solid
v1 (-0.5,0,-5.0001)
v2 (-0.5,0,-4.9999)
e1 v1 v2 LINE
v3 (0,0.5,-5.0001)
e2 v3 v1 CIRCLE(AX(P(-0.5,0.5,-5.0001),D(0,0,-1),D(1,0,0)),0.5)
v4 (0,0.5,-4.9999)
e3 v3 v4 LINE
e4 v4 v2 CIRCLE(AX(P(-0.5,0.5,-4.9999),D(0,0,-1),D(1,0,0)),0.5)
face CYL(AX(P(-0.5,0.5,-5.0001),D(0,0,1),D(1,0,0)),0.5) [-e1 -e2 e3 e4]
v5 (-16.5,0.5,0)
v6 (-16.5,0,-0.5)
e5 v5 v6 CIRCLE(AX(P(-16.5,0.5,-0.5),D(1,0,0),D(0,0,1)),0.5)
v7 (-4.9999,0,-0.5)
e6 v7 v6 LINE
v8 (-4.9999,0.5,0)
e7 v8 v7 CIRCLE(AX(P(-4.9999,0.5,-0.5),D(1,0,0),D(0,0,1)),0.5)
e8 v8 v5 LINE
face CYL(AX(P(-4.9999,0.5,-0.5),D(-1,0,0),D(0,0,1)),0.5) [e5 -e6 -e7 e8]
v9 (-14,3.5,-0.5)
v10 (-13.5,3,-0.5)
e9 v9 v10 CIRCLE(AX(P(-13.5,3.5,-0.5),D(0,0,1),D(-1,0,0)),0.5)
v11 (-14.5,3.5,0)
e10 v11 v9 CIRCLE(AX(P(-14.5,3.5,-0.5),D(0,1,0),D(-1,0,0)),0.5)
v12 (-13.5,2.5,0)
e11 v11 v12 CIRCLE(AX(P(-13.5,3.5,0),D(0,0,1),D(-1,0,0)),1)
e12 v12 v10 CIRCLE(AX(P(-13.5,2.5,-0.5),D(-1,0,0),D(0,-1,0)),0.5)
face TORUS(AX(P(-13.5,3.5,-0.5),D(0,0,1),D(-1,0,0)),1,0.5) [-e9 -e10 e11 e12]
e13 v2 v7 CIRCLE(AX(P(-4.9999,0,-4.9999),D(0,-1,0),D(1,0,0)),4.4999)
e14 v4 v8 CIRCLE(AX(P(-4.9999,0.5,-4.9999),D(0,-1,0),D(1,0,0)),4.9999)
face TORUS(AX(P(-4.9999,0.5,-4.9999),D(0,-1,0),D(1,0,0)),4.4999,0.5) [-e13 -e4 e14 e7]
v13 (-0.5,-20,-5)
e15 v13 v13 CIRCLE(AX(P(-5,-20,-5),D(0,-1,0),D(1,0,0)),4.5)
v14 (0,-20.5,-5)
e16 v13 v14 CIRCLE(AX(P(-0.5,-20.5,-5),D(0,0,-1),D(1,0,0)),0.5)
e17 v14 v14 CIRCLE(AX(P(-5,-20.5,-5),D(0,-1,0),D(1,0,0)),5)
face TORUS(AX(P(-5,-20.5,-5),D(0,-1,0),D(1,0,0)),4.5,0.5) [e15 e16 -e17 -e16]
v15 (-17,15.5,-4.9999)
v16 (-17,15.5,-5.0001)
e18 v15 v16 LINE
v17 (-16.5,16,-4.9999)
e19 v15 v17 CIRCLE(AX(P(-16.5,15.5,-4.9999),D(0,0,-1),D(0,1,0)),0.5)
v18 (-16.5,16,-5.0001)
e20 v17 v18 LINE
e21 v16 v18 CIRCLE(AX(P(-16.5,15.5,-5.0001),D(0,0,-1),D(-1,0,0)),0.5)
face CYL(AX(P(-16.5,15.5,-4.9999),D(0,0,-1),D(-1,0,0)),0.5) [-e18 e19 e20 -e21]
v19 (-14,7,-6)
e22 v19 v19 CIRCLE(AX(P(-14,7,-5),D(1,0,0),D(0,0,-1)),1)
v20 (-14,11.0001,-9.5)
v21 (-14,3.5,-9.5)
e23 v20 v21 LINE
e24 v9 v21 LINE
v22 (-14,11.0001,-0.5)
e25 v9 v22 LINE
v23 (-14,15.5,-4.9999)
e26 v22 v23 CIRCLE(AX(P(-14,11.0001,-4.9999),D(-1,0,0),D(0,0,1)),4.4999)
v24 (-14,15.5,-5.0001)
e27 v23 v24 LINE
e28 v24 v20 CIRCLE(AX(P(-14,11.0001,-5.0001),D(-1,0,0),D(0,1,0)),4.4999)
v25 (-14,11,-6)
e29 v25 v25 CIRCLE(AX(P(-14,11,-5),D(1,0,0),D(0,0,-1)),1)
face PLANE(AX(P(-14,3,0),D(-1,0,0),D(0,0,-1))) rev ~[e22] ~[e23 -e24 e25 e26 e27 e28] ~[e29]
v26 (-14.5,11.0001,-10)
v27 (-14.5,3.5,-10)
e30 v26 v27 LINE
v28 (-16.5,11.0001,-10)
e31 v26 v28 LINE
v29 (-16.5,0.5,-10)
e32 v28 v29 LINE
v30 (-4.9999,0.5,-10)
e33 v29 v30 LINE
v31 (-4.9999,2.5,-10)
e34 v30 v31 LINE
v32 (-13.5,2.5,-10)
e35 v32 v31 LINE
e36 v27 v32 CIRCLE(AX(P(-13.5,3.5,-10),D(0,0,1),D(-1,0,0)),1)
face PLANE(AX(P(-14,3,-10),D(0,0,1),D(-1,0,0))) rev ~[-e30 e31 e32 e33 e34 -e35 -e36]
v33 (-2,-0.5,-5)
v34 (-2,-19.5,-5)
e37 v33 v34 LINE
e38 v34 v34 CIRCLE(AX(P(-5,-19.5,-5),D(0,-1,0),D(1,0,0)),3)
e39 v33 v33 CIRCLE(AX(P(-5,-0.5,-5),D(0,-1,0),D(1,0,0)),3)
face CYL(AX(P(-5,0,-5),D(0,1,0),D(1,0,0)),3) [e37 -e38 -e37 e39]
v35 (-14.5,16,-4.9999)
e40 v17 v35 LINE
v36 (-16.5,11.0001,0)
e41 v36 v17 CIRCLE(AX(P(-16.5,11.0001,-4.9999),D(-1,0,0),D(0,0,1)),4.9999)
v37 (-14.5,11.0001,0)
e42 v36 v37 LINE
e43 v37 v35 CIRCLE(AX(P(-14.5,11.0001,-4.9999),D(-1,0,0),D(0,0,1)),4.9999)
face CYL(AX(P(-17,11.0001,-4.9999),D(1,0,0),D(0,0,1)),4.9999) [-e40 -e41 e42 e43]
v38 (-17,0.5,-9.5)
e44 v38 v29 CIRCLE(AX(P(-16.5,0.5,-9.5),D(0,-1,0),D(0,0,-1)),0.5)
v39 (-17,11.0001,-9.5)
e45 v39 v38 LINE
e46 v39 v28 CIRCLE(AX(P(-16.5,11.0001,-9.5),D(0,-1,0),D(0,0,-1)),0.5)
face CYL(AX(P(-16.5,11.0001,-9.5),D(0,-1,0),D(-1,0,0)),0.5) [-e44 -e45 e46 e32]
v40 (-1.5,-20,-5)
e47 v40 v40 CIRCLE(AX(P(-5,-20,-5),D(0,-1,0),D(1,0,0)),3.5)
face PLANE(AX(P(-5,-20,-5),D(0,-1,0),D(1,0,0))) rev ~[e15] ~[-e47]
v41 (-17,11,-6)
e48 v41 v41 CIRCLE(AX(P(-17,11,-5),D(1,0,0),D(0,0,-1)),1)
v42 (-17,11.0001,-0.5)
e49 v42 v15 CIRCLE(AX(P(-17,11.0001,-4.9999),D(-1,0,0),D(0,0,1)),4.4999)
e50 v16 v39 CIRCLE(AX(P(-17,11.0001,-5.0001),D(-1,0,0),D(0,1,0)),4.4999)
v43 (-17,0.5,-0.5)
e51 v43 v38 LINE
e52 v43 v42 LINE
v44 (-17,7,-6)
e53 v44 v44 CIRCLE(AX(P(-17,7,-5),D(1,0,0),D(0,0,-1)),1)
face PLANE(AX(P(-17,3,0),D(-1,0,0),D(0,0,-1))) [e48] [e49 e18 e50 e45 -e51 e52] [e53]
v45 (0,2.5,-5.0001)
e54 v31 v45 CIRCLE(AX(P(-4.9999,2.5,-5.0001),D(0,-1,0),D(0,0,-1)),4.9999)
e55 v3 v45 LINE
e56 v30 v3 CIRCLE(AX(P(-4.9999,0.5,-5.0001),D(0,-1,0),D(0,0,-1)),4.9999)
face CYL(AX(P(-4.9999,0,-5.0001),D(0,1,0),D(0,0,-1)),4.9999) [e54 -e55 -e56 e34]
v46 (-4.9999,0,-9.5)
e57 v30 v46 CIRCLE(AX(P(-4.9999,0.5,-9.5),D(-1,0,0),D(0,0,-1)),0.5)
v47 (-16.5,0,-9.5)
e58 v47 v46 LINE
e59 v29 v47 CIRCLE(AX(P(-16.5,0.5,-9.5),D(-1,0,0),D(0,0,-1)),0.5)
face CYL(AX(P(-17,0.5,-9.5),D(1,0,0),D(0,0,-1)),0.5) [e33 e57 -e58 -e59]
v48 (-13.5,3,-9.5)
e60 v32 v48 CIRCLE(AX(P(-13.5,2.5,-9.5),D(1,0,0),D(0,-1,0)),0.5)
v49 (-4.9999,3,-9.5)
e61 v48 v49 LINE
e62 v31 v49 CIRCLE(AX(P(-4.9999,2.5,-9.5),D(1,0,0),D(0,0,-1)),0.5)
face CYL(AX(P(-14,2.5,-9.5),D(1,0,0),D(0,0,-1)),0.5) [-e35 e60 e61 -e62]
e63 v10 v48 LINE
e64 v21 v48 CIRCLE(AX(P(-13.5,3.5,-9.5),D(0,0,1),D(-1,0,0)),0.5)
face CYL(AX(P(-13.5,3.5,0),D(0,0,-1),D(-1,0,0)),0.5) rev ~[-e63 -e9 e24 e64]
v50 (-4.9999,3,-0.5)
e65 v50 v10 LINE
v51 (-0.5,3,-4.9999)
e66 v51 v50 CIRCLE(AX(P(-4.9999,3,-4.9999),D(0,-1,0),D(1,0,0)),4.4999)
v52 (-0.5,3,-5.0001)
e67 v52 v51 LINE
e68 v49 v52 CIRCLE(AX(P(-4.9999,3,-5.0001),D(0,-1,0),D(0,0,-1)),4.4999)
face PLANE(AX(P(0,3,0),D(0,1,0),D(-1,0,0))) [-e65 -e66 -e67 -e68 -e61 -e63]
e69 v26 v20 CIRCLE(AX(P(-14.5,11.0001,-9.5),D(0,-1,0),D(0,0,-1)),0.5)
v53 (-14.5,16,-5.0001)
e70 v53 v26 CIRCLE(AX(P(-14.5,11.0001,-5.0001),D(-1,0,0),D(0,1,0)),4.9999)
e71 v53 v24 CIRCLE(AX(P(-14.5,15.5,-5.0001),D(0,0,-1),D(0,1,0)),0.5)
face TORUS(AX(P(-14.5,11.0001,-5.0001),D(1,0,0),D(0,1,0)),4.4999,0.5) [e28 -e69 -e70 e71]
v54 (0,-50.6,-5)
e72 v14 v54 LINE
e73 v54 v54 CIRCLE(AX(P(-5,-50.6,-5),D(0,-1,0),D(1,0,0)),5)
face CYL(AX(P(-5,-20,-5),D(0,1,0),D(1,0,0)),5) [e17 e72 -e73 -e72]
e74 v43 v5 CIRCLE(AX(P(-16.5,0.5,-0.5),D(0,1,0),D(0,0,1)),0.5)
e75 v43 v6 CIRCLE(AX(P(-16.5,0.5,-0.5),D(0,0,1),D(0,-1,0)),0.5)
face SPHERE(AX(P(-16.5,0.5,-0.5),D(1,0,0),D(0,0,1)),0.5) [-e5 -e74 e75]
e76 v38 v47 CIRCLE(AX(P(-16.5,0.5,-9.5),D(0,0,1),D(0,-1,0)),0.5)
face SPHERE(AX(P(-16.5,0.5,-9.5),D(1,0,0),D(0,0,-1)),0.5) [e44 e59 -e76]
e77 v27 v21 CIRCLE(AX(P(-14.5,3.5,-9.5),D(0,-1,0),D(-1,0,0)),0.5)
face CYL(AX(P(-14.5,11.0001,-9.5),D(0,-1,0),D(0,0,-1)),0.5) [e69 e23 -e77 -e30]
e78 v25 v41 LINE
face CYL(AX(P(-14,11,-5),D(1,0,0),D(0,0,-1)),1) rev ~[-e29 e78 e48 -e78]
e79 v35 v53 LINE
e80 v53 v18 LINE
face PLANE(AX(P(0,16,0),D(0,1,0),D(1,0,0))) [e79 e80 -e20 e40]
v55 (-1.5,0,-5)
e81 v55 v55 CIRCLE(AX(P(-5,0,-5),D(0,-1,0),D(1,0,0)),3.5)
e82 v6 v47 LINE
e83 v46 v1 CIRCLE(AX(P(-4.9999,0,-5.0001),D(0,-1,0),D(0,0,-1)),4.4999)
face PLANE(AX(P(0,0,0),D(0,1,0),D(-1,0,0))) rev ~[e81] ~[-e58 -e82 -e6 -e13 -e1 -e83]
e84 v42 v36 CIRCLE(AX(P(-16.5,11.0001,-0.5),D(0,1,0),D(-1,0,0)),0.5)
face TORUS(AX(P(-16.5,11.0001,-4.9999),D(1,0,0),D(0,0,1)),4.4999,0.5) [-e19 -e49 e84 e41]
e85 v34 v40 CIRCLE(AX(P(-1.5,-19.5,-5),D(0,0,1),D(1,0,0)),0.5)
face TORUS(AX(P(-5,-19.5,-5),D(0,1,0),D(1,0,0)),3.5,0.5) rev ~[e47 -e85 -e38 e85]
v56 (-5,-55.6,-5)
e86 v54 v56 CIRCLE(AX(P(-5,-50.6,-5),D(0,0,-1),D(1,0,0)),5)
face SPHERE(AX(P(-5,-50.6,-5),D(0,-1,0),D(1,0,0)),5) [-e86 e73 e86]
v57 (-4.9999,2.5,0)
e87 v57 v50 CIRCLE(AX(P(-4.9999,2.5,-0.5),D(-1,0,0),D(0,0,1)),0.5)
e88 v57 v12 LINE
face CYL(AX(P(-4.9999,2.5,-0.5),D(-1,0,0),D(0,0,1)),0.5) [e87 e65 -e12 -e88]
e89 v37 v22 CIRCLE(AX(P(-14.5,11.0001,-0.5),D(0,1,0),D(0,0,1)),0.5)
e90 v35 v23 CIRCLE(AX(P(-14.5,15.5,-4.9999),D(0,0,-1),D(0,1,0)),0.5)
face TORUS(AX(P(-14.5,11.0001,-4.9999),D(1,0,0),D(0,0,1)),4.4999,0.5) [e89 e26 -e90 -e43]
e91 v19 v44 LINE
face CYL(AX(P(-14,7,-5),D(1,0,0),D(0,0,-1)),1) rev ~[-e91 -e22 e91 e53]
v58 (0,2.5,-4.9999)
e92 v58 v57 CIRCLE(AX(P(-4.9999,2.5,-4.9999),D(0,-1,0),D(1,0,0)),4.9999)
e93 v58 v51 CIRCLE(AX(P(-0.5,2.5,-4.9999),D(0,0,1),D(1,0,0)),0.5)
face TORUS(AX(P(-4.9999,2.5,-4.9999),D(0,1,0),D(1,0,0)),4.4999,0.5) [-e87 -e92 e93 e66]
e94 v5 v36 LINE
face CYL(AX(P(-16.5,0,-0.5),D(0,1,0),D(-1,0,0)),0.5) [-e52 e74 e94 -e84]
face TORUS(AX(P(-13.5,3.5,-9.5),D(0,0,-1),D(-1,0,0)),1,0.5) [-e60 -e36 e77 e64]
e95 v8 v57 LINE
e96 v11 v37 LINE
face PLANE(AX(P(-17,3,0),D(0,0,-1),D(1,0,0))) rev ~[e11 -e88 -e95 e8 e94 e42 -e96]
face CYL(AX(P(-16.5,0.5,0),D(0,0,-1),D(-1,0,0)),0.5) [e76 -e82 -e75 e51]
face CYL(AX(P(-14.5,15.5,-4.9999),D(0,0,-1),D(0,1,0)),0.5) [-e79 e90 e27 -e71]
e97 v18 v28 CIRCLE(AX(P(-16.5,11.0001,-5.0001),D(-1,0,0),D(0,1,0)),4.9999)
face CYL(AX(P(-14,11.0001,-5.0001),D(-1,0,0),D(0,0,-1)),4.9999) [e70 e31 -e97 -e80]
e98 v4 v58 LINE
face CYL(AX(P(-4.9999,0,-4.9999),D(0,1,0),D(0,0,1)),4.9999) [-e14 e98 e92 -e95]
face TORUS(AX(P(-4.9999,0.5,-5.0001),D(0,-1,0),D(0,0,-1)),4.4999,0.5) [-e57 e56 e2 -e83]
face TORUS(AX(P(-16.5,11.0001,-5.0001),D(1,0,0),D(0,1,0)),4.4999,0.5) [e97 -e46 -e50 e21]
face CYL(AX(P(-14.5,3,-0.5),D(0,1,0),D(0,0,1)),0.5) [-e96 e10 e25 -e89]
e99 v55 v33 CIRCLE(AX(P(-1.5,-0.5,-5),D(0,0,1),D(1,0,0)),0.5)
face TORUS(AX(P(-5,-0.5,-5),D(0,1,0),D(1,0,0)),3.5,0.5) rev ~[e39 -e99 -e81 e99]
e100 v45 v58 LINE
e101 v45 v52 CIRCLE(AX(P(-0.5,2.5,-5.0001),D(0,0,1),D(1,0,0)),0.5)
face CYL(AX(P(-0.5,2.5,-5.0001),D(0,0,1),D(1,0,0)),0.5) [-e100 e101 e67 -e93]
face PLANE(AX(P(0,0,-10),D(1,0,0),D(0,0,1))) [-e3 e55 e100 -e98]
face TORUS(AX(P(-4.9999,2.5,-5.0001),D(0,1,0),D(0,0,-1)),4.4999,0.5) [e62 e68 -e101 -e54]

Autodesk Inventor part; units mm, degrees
ref_plane "YZ Plane" through (0, 0, 0) normal (1, 0, 0) x (0, 1, 0)
ref_plane "XZ Plane" through (0, 0, 0) normal (0, 1, 0) x (-1, 0, 0)
ref_plane "XY Plane" through (0, 0, 0) normal (0, 0, 1) x (1, 0, 0)
sketch "Sketch2" plane through (0, 0, 0) normal (0, 1, 0) x (-1, 0, 0)
  line L0 (0, 0) -> (17, 0)
  line L1 (17, 0) -> (17, -10)
  line L2 (17, -10) -> (0, -10)
  line L3 (0, -10) -> (0, 0)
  line L4 (17, 0) -> (14, 0)
  line L5 (14, -10) -> (17, -10)
  line L6 (17, -10) -> (17, 0)
  dimension "d2" = 17
  dimension "d3" = 10
extrude "Extrusion1" add sketch "Sketch2" along normal blind 3
fillet "Fillet1" radius 5 2 edges at (0, 1.5, -10) (0, 1.5, 0)
sketch "Sketch5" plane through (0, 0, 0) normal (0, -1, 0) x (1, 0, 0)
  circle A0 centre (-5, -5) radius 3
  line L0 (-17, 0) -> (-5, 0) projected
  arc A1 (-5, -10) -> (-5, 0) centre (-5, -5) ccw projected
  point P0 (0, 0)
  dimension "d19" = 6
  dimension "d20" = 5
  dimension "d21" = 0
extrude "Extrusion4" add sketch "Sketch5" along normal blind 20
sketch "Sketch6" plane through (-5, -20, -5) normal (0, -1, 0) x (1, 0, 0)
  circle A0 centre (0, 0) radius 5
  point P0 (5, 5)
  dimension "d24" = 10
extrude "Extrusion5" add sketch "Sketch6" along normal blind 35.6
fillet "Fillet2" radius 5 1 edges at (-10, -55.6, -5)
sketch "Sketch7" plane through (0, 3, 0) normal (0, 1, 0) x (1, 0, 0)
  line L0 (-17, 0) -> (-17, 10) projected
  line L1 (-17, 0) -> (-14, 0)
  line L2 (-14, 0) -> (-14, 10)
  line L3 (-14, 10) -> (-17, 10)
  line L4 (-17, 10) -> (-17, 0)
  point P0 (0, 0)
  dimension "d29" = 3
  dimension "d30" = 10
extrude "Extrusion6" add sketch "Sketch7" along normal blind 13
fillet "Fillet4" radius 5 2 edges at (-15.5, 16, 0) (-15.5, 16, -10)
sketch "Sketch8" plane through (-14, 3, 0) normal (1, 0, 0) x (0, 0, -1)
  circle A0 centre (5, 8) radius 1
  circle A1 centre (5, 4) radius 1
  arc A2 (10, 8) -> (0, 8) centre (5, 8) ccw projected
  line L0 (0, 0) -> (0, 8) projected
  line L1 (10, 0) -> (10, 8) projected
  point P0 (0, -3)
  dimension "d34" = 2
  dimension "d35" = 2
  dimension "d36" = 0
  dimension "d37" = 4
  dimension "d38" = 5
  dimension "d39" = 5
  dimension "d40" = 10
  dimension "d41" = 5
extrude "Extrusion7" cut sketch "Sketch8" against normal blind 3
fillet "Fillet5" radius 0.5 17 edges at (-10, -20, -5) (-8, -20, -5) (-11, 0, -10) (-11, 0, 0) (-1.4644, 0, -8.5356) (-8, 0, -5) (-9.5, 3, 0) (-9.5, 3, -10) (-1.4644, 3, -8.5356) (-14, 3, -5) (-14, 14.5356, -1.4644) (-14, 7, 0) (-14, 7, -10) (-17, 5.5, 0) (-17, 5.5, -10) (-17, 14.5356, -1.4644) (-17, 0, -5)
properties part number "toe"
